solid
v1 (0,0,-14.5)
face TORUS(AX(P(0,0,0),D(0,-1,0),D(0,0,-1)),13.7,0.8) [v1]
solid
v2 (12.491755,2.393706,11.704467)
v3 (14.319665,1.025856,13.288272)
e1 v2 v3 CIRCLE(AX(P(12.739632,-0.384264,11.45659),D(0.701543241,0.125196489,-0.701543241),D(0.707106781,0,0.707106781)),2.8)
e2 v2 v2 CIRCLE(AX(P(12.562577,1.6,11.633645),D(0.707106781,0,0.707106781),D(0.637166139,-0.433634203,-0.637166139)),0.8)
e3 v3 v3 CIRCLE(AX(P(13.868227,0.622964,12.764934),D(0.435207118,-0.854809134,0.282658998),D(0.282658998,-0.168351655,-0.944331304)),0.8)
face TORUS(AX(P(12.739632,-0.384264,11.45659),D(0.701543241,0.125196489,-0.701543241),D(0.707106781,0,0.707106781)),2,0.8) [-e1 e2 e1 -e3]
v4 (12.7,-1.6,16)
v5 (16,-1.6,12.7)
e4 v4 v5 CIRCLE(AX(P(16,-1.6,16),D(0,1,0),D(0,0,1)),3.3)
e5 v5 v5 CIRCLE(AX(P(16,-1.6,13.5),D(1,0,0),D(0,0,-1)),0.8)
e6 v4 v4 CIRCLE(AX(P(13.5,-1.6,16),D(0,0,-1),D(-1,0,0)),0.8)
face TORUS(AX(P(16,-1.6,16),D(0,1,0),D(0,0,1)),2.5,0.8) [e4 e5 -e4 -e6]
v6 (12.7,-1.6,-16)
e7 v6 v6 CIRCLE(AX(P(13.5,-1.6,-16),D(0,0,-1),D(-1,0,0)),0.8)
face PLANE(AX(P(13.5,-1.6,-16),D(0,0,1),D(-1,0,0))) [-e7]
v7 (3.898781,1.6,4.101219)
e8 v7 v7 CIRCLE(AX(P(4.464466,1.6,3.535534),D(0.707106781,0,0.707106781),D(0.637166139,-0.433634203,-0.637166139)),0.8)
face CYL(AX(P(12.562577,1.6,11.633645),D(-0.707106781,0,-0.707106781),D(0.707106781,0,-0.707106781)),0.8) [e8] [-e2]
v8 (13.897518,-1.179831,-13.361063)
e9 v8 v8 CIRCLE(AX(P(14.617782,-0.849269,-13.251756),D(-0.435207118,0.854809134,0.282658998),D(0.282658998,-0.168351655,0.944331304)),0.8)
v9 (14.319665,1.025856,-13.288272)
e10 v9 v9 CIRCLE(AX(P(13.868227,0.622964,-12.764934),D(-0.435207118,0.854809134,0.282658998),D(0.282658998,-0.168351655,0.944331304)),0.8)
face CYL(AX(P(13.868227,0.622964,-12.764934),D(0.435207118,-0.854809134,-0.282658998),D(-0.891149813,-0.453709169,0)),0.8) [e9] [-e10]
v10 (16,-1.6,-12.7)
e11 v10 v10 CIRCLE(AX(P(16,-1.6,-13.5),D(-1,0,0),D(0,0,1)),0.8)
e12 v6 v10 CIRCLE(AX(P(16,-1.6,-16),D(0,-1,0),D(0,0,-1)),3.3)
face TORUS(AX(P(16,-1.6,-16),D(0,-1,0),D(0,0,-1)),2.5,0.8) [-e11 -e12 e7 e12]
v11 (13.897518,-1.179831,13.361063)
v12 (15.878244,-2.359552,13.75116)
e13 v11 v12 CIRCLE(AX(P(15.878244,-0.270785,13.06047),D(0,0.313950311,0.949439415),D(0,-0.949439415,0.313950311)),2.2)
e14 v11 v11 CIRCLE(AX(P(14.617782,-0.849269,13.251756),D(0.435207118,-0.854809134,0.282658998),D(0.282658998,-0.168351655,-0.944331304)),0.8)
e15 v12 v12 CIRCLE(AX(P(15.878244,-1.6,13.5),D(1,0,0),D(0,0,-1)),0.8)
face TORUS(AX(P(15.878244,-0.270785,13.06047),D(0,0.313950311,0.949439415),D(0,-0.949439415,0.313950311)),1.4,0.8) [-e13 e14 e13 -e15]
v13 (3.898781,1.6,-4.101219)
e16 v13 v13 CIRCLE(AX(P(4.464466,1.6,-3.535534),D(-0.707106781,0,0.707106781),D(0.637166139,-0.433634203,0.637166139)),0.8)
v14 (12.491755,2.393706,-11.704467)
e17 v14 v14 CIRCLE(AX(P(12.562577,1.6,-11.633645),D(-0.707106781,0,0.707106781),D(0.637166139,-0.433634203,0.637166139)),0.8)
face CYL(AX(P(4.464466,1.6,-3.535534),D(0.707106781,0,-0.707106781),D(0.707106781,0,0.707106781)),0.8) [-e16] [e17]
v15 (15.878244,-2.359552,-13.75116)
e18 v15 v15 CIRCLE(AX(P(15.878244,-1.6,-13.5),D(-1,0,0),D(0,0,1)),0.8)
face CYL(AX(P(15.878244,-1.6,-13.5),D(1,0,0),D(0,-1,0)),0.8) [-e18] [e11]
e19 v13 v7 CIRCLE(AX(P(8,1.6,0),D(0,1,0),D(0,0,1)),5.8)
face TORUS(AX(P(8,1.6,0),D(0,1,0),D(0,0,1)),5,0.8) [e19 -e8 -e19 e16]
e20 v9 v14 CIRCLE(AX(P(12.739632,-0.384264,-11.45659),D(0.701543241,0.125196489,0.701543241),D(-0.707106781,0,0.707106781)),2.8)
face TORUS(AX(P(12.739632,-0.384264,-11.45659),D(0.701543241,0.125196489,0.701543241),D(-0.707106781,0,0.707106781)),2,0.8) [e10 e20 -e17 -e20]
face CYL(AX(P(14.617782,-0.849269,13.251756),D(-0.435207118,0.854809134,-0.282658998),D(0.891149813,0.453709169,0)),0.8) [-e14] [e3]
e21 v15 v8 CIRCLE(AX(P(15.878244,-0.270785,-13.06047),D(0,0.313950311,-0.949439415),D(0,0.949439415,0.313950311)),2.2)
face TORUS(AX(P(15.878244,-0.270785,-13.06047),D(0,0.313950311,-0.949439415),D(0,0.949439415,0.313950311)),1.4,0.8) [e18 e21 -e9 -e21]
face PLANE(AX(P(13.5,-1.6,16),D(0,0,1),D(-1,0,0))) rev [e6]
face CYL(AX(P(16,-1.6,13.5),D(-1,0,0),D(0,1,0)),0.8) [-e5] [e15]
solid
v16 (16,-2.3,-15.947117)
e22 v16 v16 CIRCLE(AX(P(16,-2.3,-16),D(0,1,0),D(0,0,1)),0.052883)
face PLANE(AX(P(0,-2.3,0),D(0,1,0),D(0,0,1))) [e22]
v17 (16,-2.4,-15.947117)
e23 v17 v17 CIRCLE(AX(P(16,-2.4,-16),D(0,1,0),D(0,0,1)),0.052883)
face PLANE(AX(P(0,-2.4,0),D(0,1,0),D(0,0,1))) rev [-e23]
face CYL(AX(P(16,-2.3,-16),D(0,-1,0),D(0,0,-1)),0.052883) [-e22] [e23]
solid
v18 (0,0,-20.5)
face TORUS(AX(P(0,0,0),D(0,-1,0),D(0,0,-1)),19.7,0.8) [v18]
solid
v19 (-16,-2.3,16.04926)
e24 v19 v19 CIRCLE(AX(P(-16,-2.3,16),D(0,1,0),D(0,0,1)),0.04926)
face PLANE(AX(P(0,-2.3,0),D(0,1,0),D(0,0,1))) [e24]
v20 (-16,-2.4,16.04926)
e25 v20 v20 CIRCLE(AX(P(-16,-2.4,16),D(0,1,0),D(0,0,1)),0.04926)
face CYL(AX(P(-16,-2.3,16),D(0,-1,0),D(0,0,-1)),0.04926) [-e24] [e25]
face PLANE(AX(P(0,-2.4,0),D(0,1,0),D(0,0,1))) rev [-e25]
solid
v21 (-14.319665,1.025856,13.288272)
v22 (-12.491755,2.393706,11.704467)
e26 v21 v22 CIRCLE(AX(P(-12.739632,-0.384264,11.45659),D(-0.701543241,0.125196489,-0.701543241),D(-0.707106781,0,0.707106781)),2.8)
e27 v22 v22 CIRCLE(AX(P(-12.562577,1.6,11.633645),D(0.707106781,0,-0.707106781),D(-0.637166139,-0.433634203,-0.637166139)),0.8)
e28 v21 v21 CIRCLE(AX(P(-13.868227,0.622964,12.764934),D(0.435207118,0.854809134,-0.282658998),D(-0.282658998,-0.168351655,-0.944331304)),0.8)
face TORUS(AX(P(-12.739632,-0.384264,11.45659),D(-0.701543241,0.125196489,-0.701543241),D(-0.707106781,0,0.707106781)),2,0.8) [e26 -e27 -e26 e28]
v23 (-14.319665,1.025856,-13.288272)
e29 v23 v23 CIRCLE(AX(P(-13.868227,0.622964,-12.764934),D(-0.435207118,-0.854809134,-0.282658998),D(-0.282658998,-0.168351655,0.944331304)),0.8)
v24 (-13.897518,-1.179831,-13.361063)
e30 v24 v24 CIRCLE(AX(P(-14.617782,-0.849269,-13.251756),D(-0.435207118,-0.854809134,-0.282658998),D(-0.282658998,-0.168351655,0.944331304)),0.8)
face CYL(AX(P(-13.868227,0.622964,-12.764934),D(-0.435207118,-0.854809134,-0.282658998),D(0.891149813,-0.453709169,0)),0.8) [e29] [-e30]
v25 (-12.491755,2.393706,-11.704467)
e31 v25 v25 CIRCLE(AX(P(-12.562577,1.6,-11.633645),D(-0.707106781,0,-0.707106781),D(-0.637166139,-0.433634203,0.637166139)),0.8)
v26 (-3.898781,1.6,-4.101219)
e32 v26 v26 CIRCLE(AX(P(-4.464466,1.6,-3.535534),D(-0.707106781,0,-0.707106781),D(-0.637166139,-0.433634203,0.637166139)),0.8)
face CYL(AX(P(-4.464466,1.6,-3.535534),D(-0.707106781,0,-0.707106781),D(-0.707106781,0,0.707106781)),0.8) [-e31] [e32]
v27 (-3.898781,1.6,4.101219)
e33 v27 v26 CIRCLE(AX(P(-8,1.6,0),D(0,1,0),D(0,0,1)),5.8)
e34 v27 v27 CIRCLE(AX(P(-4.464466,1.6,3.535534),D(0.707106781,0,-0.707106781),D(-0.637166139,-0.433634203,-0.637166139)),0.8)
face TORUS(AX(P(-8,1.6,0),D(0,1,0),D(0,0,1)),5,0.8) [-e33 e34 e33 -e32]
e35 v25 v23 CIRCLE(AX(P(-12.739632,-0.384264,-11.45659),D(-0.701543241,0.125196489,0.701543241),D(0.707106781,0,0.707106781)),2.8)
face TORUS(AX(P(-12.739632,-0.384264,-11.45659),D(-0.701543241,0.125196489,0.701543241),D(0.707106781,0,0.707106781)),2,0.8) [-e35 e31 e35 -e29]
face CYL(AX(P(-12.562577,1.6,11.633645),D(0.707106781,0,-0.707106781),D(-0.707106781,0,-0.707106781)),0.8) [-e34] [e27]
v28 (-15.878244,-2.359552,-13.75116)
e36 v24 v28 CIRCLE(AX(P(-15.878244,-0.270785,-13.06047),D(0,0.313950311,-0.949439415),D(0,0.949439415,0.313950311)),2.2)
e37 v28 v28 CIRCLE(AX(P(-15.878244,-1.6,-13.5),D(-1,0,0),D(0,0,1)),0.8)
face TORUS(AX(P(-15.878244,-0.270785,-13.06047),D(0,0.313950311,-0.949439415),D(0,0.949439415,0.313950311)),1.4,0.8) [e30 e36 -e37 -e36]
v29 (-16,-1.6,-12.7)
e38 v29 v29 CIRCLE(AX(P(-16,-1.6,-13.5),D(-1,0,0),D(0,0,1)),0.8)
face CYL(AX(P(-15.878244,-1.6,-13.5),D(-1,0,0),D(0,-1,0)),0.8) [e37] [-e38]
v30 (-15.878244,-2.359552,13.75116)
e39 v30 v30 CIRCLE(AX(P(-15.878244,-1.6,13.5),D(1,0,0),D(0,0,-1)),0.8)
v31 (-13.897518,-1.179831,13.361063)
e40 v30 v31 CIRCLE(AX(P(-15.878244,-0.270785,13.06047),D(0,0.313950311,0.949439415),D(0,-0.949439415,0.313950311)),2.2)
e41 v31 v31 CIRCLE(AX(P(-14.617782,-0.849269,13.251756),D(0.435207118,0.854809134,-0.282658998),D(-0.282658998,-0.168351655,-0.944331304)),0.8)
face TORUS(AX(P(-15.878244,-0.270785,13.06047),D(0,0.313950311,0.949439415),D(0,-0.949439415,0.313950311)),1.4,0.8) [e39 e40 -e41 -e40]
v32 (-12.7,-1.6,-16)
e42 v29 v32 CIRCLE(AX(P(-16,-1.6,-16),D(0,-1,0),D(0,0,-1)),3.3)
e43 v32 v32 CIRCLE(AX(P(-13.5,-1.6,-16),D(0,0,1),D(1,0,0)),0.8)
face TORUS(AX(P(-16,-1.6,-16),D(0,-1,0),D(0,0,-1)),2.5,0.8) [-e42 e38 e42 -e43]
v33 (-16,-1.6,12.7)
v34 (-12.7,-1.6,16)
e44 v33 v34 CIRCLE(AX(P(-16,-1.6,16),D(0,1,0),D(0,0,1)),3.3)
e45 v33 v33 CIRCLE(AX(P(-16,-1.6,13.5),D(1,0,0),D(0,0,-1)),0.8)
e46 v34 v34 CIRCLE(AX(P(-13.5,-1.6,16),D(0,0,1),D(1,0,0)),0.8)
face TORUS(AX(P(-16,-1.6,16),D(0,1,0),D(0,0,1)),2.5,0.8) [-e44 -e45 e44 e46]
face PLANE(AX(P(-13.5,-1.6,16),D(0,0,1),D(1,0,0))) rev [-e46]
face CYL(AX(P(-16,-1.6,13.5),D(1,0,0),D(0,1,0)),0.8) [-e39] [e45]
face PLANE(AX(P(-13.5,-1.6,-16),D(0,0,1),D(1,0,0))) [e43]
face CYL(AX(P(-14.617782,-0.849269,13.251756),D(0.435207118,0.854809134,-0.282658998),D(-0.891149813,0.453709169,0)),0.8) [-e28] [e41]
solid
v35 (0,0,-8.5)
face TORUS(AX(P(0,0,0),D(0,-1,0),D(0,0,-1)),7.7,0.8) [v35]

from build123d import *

# Parameters (mm, degrees)
SKETCH_2_R                = 0.8
SWEEP_2_OUTLINE_R         = 0.8
SWEEP_2_ANGLE             = 270
SWEEP_2_2_OUTLINE_R       = 0.8
SWEEP_2_2_ANGLE           = 64.201526
SWEEP_2_3_OUTLINE_R       = 0.8
SWEEP_2_3_ANGLE           = 59.495369
SWEEP_2_4_OUTLINE_R       = 0.8
SWEEP_2_4_ANGLE           = 90
SWEEP_2_5_OUTLINE_R       = 0.8
SWEEP_2_5_ANGLE           = 59.495369
SWEEP_2_6_OUTLINE_R       = 0.8
SWEEP_2_6_ANGLE           = 64.201526
SWEEP_2_7_OUTLINE_R       = 0.8
SWEEP_2_7_ANGLE           = 270
SWEEP_START               = -16.0000001
SWEEP_2_8_OUTLINE_R       = 0.8
SWEEP_2_8_DEPTH           = 0.121755873
SWEEP_START_2             = -10.833453621
SWEEP_2_9_OUTLINE_R       = 0.8
SWEEP_2_9_DEPTH           = 1.722294661
SWEEP_START_3             = -17.109312799
SWEEP_2_10_OUTLINE_R      = 0.8
SWEEP_2_10_DEPTH          = 11.45245865
SWEEP_2_11_OUTLINE_R      = 0.8
SWEEP_2_11_DEPTH          = 11.45245865
SWEEP_2_12_OUTLINE_R      = 0.8
SWEEP_2_12_DEPTH          = 1.722294661
SWEEP_2_13_OUTLINE_R      = 0.8
SWEEP_2_13_DEPTH          = 0.121755873
CROQUIS1_R                = 0.049260452
SALIENTE_EXTRUIR1_DEPTH   = 0.1
CROQUIS1_R_2              = 0.052882522
SALIENTE_EXTRUIR1_2_DEPTH = 0.1


with BuildPart() as part:
    # По траектории1: sweep along a path in Эскиз1
    with BuildLine(Plane(origin=(0, 0, 0), x_dir=(1, 0, 0), z_dir=(0, 1, 0))) as sweep_1_path:
        CenterArc((0, 0), 19.7, 0, 360)
    # Эскиз2 → По траектории1 (sweep)
    with BuildSketch(Plane.XY):
        with Locations((19.7, 0)):
            Circle(SKETCH_2_R)
        with Locations((13.7, 0)):
            Circle(SKETCH_2_R)
        with Locations((7.7, 0)):
            Circle(SKETCH_2_R)
    sweep(path=sweep_1_path.line)


with BuildPart() as body_2:
    # По траектории2: read off the stored shape, not the designer's step
    # По траектории2 outline → По траектории2 (revolve)
    with BuildSketch(Plane(origin=(-16, 0, -16), x_dir=(1, 0, 0), z_dir=(0, 0, 1))):
        with Locations((2.5, -1.6)):
            Circle(SWEEP_2_OUTLINE_R)
    revolve(axis=Axis((-16, 0, -16), (0, 1, 0)), revolution_arc=SWEEP_2_ANGLE)

    # Sweep 2 2 outline → Sweep 2 2 (revolve)
    with BuildSketch(Plane(origin=(-15.878244327, -4.137117935, -1.368017212), x_dir=(0.9003303642061121, -0.413202791127157, -0.13663340987187794), z_dir=(0.43520711769051934, 0.8548091340984048, 0.28265899768704694))):
        with Locations((1.4, 12.315111602)):
            Circle(SWEEP_2_2_OUTLINE_R)
    revolve(axis=Axis((-15.878244327, -4.137117935, -1.368017212), (0, 0.31395031082428093, -0.9494394147776558)), revolution_arc=SWEEP_2_2_ANGLE)

    # Sweep 2 3 outline → Sweep 2 3 (revolve)
    with BuildSketch(Plane(origin=(-12.141916519, -0.490931402, -12.054305543), x_dir=(-0.5642976565367124, 0.5036141214653465, -0.6541719739394692), z_dir=(-0.43520711769049536, -0.8548091340984181, -0.28265899768704283))):
        with Locations((2, -0.852000479)):
            Circle(SWEEP_2_3_OUTLINE_R)
    revolve(axis=Axis((-12.141916519, -0.490931402, -12.054305543), (0.7015432413890861, -0.125196489258284, -0.7015432413890781)), revolution_arc=SWEEP_2_3_ANGLE)

    # Sweep 2 4 outline → Sweep 2 4 (revolve)
    with BuildSketch(Plane(origin=(-8, 0, 0), x_dir=(0.7071067811865457, 0, 0.7071067811865493), z_dir=(-0.7071067811865493, 0, 0.7071067811865457))):
        with Locations((5.000000002, 1.6)):
            Circle(SWEEP_2_4_OUTLINE_R)
    revolve(axis=Axis((-8, 0, 0), (0, 1, 0)), revolution_arc=SWEEP_2_4_ANGLE)

    # Sweep 2 5 outline → Sweep 2 5 (revolve)
    with BuildSketch(Plane(origin=(-12.141916519, -0.490931402, 12.054305543), x_dir=(0.0885272865352575, 0.99213196656363, 0.08852728653522032), z_dir=(0.7071067811865515, -2.713801405818117e-14, -0.7071067811865441))):
        with Locations((2, -0.852000479)):
            Circle(SWEEP_2_5_OUTLINE_R)
    revolve(axis=Axis((-12.141916519, -0.490931402, 12.054305543), (0.701543241389082, -0.12519648925822402, 0.7015432413890942)), revolution_arc=SWEEP_2_5_ANGLE)

    # Sweep 2 6 outline → Sweep 2 6 (revolve)
    with BuildSketch(Plane(origin=(-15.878244327, -4.137117935, 1.368017212), x_dir=(1.3934999695075554e-15, -0.9494394147776508, 0.3139503108242959), z_dir=(-1, 0, 0))):
        with Locations((1.4, 12.315111602)):
            Circle(SWEEP_2_6_OUTLINE_R)
    revolve(axis=Axis((-15.878244327, -4.137117935, 1.368017212), (0, 0.3139503108242959, 0.9494394147776508)), revolution_arc=SWEEP_2_6_ANGLE)

    # Sweep 2 7 outline → Sweep 2 7 (revolve)
    with BuildSketch(Plane(origin=(-16, 0, 16), x_dir=(0, 0, -1), z_dir=(1, 0, 0))):
        with Locations((2.5, -1.6)):
            Circle(SWEEP_2_7_OUTLINE_R)
    revolve(axis=Axis((-16, 0, 16), (0, 1, 0)), revolution_arc=SWEEP_2_7_ANGLE)

    # Sweep 2 8 outline → Sweep 2 8 (add)
    with BuildSketch(Plane.YZ.offset(SWEEP_START)):
        with Locations((-1.6, -13.5)):
            Circle(SWEEP_2_8_OUTLINE_R)
    extrude(amount=SWEEP_2_8_DEPTH)

    # Sweep 2 9 outline → Sweep 2 9 (add)
    with BuildSketch(Plane(origin=(0, 0, 0), x_dir=(0.90033036420612, -0.4132027911271415, -0.1366334098718725), z_dir=(0.43520711769050285, 0.8548091340984126, 0.2826589976870489)).offset(SWEEP_START_2)):
        with Locations((-10.999279964, 12.315111602)):
            Circle(SWEEP_2_9_OUTLINE_R)
    extrude(amount=SWEEP_2_9_DEPTH)

    # Sweep 2 10 outline → Sweep 2 10 (add)
    with BuildSketch(Plane(origin=(0, 0, 0), x_dir=(0.7071067811865509, 0, -0.707106781186544), z_dir=(0.707106781186544, 0, 0.707106781186551)).offset(SWEEP_START_3)):
        with Locations((-0.656854248, 1.6)):
            Circle(SWEEP_2_10_OUTLINE_R)
    extrude(amount=SWEEP_2_10_DEPTH)

    # Sweep 2 11 outline → Sweep 2 11 (add)
    with BuildSketch(Plane(origin=(0, 0, 0), x_dir=(0.707106781186541, 0, 0.707106781186554), z_dir=(0.707106781186554, 0, -0.707106781186541)).offset(SWEEP_START_3)):
        with Locations((-0.656854248, -1.6)):
            Circle(SWEEP_2_11_OUTLINE_R)
    extrude(amount=SWEEP_2_11_DEPTH)

    # Sweep 2 12 outline → Sweep 2 12 (add)
    with BuildSketch(Plane(origin=(0, 0, 0), x_dir=(0.9003303642061413, -0.41320279112709724, 0.1366334098718661), z_dir=(0.43520711769045883, 0.8548091340984276, -0.28265899768707087)).offset(SWEEP_START_2)):
        with Locations((-10.999279964, -12.315111602)):
            Circle(SWEEP_2_12_OUTLINE_R)
    extrude(amount=SWEEP_2_12_DEPTH)

    # Sweep 2 13 outline → Sweep 2 13 (add)
    with BuildSketch(Plane.YZ.offset(SWEEP_START)):
        with Locations((-1.6, 13.5)):
            Circle(SWEEP_2_13_OUTLINE_R)
    extrude(amount=SWEEP_2_13_DEPTH)


with BuildPart() as body_3:
    # Зеркальное отражение1: mirrored copy
    add(body_2.part.mirror(Plane(origin=(0, 0, 0), x_dir=(0, 0, 1), z_dir=(1, 0, 0))))


with BuildPart() as body_4:
    # Croquis1 → Saliente-Extruir1 (new body)
    with BuildSketch(Plane(origin=(0, -2.4, 0), x_dir=(1, 0, 0), z_dir=(0, 1, 0))):
        with Locations(Location((-16, -16, 0), (0, 0, 270))):
            Circle(CROQUIS1_R)
    extrude(amount=SALIENTE_EXTRUIR1_DEPTH)


with BuildPart() as body_5:
    # Croquis1 → Saliente-Extruir1 2 (new body)
    with BuildSketch(Plane(origin=(0, -2.4, 0), x_dir=(1, 0, 0), z_dir=(0, 1, 0))):
        with Locations(Location((16, 16, 0), (0, 0, 270))):
            Circle(CROQUIS1_R_2)
    extrude(amount=SALIENTE_EXTRUIR1_2_DEPTH)


solid = Compound([part.part, body_2.part, body_3.part, body_4.part, body_5.part])
